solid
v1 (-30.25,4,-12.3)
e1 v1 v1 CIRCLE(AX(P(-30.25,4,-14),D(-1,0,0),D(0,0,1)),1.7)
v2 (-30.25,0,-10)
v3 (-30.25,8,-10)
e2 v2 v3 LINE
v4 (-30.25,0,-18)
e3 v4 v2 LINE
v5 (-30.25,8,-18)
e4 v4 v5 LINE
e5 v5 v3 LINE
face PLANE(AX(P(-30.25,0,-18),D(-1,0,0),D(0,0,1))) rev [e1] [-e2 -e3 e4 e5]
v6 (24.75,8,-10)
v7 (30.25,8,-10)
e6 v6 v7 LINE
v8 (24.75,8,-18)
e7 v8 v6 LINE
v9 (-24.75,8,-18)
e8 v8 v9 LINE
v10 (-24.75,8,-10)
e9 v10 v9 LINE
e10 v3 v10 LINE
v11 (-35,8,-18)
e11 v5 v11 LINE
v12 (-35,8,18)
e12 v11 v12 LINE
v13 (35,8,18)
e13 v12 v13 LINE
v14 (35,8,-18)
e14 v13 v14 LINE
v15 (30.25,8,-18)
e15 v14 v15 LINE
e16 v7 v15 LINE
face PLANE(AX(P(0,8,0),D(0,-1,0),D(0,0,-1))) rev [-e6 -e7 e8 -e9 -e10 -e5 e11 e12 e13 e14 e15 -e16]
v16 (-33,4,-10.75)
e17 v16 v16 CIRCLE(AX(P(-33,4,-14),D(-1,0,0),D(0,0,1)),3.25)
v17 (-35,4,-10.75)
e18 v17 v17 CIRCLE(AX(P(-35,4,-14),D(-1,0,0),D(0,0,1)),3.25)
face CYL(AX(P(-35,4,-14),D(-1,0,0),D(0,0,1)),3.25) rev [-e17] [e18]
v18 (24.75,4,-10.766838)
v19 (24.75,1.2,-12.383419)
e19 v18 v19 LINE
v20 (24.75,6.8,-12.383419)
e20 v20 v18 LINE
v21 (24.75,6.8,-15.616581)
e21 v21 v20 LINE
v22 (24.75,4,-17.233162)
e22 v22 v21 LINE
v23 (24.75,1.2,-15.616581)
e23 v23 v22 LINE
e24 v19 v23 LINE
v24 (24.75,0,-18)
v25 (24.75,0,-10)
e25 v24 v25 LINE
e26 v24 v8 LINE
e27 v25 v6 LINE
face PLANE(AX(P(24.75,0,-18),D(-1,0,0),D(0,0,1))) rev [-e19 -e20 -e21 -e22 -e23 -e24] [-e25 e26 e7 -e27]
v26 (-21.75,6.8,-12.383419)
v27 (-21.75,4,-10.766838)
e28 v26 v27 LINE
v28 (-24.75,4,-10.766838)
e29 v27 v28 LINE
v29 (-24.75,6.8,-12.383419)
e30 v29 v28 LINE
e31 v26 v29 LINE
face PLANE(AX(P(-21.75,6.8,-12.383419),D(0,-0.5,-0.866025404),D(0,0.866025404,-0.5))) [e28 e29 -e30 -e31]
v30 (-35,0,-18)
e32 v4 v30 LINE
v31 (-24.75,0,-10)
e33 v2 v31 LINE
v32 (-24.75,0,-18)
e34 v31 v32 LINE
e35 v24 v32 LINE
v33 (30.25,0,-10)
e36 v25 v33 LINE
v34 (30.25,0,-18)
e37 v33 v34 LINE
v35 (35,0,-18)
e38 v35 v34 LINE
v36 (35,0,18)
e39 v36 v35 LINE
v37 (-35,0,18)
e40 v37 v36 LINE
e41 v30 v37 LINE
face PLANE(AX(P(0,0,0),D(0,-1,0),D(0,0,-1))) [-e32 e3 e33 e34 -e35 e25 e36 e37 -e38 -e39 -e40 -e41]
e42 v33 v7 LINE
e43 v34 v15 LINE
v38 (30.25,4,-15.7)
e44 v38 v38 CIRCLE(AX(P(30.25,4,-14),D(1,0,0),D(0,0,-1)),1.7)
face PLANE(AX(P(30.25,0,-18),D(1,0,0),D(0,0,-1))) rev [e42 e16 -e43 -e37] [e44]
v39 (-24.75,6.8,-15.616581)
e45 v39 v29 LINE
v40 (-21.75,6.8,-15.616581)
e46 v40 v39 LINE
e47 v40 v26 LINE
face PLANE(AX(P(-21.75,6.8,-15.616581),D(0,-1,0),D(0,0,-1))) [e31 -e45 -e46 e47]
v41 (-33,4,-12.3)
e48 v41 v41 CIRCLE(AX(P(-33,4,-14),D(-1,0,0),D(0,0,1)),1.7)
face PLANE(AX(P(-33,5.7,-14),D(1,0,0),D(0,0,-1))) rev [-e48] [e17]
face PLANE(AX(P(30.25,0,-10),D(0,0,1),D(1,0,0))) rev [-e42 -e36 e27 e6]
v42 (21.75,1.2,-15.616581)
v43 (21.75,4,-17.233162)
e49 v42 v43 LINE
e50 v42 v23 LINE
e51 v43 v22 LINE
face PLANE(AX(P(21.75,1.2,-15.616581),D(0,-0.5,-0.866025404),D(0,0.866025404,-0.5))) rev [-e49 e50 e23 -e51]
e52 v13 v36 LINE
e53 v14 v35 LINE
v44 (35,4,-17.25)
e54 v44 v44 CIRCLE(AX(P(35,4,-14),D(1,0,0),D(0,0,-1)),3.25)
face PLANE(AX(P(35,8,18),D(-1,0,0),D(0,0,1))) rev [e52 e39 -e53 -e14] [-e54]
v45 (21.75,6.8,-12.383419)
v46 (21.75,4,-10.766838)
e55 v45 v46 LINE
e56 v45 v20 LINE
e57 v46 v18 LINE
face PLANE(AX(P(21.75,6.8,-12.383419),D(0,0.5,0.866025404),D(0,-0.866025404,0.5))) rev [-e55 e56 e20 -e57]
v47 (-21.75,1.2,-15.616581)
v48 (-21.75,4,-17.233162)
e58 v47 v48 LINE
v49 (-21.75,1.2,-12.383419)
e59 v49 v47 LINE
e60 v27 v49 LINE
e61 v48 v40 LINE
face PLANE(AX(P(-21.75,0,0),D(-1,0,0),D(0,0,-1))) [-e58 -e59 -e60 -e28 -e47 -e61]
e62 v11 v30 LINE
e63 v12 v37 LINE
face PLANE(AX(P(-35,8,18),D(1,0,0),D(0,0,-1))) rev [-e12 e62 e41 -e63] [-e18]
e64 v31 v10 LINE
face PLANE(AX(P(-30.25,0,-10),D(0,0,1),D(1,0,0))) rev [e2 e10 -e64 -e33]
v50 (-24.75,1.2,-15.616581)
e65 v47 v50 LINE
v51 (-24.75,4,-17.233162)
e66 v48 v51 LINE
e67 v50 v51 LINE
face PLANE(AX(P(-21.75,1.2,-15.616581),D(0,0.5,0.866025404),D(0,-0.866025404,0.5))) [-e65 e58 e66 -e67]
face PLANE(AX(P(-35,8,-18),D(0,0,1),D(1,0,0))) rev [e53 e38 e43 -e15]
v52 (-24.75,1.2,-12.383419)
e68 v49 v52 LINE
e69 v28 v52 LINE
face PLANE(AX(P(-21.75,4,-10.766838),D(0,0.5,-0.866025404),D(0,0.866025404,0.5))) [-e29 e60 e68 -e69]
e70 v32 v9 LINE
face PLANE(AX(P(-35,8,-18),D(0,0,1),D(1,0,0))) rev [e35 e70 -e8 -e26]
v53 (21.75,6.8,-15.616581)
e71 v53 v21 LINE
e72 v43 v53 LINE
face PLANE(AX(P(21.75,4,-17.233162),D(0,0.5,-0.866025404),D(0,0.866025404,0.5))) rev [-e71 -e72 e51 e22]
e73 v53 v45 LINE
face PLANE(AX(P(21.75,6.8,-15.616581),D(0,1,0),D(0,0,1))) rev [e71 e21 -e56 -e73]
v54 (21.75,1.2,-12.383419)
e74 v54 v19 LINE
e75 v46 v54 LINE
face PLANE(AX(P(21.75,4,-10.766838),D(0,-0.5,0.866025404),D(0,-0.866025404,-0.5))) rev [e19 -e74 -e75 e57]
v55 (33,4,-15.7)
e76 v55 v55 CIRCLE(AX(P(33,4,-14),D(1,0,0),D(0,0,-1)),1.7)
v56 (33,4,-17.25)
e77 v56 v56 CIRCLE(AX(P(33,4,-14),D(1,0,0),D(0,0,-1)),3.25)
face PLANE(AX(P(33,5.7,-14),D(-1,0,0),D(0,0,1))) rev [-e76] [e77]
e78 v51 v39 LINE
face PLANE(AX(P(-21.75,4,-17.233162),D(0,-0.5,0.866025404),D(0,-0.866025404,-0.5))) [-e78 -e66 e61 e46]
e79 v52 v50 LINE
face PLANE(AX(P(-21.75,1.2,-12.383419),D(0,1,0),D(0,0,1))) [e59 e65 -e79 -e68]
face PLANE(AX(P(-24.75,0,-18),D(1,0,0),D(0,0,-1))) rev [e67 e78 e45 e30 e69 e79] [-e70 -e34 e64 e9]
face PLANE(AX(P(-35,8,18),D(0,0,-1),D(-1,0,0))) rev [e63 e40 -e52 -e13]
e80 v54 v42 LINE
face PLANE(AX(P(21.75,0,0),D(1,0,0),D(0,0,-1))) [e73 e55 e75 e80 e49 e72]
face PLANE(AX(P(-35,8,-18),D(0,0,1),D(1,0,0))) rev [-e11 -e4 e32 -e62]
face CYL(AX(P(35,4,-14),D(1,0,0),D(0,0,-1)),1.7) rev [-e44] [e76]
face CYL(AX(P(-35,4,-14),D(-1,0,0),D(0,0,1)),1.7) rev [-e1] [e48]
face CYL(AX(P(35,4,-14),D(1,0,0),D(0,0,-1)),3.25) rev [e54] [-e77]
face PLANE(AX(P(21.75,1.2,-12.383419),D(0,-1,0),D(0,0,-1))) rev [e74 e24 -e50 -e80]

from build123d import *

# Parameters (mm, degrees)
SKETCH1_W                                  = 70
SKETCH1_H                                  = 36
BOSS_EXTRUDE1_DEPTH                        = 8
SKETCH2_W                                  = 5.5
SKETCH2_H                                  = 8
CUT_EXTRUDE1_DEPTH                         = 41.162171256
CBORE_START                                = 33
CBORE_FOR_M3_CHEESE_HEAD_SCREW1_OUTLINE_R  = 3.25
CBORE_FOR_M3_CHEESE_HEAD_SCREW1_DEPTH      = 2
CBORE_START_2                              = 30.25
CBORE_FOR_M3_CHEESE_HEAD_SCREW1_2_OUTLIN_R = 1.7
CBORE_FOR_M3_CHEESE_HEAD_SCREW1_2_DEPTH    = 2.75
CUT_EXTRUDE2_DEPTH                         = 3


# Read off the part's stored shape, not the designer's step: CBORE for M3 Cheese Head Screw1
with BuildPart() as part:
    # Sketch1 → Boss-Extrude1 (new body)
    with BuildSketch(Plane(origin=(0, 0, 0), x_dir=(1, 0, 0), z_dir=(0, 1, 0))):
        Rectangle(SKETCH1_W, SKETCH1_H)
    extrude(amount=BOSS_EXTRUDE1_DEPTH)

    # Sketch2 → Cut-Extrude1 (cut, through all)
    with BuildSketch(Plane(origin=(0, 8, 0), x_dir=(1, 0, 0), z_dir=(0, 1, 0))):
        with Locations((-27.5, 14)):
            Rectangle(SKETCH2_W, SKETCH2_H)
        with Locations((27.5, 14)):
            Rectangle(SKETCH2_W, SKETCH2_H)
    extrude(amount=-CUT_EXTRUDE1_DEPTH, mode=Mode.SUBTRACT)

    # CBORE for M3 Cheese Head Screw1 outline → CBORE for M3 Cheese Head Screw1 (cut)
    with BuildSketch(Plane.YZ.offset(CBORE_START)):
        with Locations((4, -14)):
            Circle(CBORE_FOR_M3_CHEESE_HEAD_SCREW1_OUTLINE_R)
    cbore_for_m3_cheese_head_screw1 = extrude(amount=CBORE_FOR_M3_CHEESE_HEAD_SCREW1_DEPTH, mode=Mode.SUBTRACT)

    # CBORE for M3 Cheese Head Screw1 2 outlin → CBORE for M3 Cheese Head Screw1 2 (cut)
    with BuildSketch(Plane.YZ.offset(CBORE_START_2)):
        with Locations((4, -14)):
            Circle(CBORE_FOR_M3_CHEESE_HEAD_SCREW1_2_OUTLIN_R)
    cbore_for_m3_cheese_head_screw1_2 = extrude(amount=CBORE_FOR_M3_CHEESE_HEAD_SCREW1_2_DEPTH, mode=Mode.SUBTRACT)

    # Sketch9 → Cut-Extrude2 (cut)
    with BuildSketch(Plane(origin=(24.75, 0, 0), x_dir=(0, 0, -1), z_dir=(1, 0, 0))):
        Polygon((15.616580754, 6.8), (12.383419246, 6.8), (10.766838493, 4), (12.383419246, 1.2), (15.616580754, 1.2), (17.233161507, 4), align=None)
    cut_extrude2 = extrude(amount=-CUT_EXTRUDE2_DEPTH, mode=Mode.SUBTRACT)

    # Mirror1: CBORE for M3 Cheese Head Screw1, CBORE for M3 Cheese Head Screw1 2, Cut-Extrude2 across plane
    add(cbore_for_m3_cheese_head_screw1.mirror(Plane(origin=(0, 0, 0), x_dir=(0, 0, 1), z_dir=(1, 0, 0))), mode=Mode.SUBTRACT)
    add(cbore_for_m3_cheese_head_screw1_2.mirror(Plane(origin=(0, 0, 0), x_dir=(0, 0, 1), z_dir=(1, 0, 0))), mode=Mode.SUBTRACT)
    add(cut_extrude2.mirror(Plane(origin=(0, 0, 0), x_dir=(0, 0, 1), z_dir=(1, 0, 0))), mode=Mode.SUBTRACT)


solid = part.part
